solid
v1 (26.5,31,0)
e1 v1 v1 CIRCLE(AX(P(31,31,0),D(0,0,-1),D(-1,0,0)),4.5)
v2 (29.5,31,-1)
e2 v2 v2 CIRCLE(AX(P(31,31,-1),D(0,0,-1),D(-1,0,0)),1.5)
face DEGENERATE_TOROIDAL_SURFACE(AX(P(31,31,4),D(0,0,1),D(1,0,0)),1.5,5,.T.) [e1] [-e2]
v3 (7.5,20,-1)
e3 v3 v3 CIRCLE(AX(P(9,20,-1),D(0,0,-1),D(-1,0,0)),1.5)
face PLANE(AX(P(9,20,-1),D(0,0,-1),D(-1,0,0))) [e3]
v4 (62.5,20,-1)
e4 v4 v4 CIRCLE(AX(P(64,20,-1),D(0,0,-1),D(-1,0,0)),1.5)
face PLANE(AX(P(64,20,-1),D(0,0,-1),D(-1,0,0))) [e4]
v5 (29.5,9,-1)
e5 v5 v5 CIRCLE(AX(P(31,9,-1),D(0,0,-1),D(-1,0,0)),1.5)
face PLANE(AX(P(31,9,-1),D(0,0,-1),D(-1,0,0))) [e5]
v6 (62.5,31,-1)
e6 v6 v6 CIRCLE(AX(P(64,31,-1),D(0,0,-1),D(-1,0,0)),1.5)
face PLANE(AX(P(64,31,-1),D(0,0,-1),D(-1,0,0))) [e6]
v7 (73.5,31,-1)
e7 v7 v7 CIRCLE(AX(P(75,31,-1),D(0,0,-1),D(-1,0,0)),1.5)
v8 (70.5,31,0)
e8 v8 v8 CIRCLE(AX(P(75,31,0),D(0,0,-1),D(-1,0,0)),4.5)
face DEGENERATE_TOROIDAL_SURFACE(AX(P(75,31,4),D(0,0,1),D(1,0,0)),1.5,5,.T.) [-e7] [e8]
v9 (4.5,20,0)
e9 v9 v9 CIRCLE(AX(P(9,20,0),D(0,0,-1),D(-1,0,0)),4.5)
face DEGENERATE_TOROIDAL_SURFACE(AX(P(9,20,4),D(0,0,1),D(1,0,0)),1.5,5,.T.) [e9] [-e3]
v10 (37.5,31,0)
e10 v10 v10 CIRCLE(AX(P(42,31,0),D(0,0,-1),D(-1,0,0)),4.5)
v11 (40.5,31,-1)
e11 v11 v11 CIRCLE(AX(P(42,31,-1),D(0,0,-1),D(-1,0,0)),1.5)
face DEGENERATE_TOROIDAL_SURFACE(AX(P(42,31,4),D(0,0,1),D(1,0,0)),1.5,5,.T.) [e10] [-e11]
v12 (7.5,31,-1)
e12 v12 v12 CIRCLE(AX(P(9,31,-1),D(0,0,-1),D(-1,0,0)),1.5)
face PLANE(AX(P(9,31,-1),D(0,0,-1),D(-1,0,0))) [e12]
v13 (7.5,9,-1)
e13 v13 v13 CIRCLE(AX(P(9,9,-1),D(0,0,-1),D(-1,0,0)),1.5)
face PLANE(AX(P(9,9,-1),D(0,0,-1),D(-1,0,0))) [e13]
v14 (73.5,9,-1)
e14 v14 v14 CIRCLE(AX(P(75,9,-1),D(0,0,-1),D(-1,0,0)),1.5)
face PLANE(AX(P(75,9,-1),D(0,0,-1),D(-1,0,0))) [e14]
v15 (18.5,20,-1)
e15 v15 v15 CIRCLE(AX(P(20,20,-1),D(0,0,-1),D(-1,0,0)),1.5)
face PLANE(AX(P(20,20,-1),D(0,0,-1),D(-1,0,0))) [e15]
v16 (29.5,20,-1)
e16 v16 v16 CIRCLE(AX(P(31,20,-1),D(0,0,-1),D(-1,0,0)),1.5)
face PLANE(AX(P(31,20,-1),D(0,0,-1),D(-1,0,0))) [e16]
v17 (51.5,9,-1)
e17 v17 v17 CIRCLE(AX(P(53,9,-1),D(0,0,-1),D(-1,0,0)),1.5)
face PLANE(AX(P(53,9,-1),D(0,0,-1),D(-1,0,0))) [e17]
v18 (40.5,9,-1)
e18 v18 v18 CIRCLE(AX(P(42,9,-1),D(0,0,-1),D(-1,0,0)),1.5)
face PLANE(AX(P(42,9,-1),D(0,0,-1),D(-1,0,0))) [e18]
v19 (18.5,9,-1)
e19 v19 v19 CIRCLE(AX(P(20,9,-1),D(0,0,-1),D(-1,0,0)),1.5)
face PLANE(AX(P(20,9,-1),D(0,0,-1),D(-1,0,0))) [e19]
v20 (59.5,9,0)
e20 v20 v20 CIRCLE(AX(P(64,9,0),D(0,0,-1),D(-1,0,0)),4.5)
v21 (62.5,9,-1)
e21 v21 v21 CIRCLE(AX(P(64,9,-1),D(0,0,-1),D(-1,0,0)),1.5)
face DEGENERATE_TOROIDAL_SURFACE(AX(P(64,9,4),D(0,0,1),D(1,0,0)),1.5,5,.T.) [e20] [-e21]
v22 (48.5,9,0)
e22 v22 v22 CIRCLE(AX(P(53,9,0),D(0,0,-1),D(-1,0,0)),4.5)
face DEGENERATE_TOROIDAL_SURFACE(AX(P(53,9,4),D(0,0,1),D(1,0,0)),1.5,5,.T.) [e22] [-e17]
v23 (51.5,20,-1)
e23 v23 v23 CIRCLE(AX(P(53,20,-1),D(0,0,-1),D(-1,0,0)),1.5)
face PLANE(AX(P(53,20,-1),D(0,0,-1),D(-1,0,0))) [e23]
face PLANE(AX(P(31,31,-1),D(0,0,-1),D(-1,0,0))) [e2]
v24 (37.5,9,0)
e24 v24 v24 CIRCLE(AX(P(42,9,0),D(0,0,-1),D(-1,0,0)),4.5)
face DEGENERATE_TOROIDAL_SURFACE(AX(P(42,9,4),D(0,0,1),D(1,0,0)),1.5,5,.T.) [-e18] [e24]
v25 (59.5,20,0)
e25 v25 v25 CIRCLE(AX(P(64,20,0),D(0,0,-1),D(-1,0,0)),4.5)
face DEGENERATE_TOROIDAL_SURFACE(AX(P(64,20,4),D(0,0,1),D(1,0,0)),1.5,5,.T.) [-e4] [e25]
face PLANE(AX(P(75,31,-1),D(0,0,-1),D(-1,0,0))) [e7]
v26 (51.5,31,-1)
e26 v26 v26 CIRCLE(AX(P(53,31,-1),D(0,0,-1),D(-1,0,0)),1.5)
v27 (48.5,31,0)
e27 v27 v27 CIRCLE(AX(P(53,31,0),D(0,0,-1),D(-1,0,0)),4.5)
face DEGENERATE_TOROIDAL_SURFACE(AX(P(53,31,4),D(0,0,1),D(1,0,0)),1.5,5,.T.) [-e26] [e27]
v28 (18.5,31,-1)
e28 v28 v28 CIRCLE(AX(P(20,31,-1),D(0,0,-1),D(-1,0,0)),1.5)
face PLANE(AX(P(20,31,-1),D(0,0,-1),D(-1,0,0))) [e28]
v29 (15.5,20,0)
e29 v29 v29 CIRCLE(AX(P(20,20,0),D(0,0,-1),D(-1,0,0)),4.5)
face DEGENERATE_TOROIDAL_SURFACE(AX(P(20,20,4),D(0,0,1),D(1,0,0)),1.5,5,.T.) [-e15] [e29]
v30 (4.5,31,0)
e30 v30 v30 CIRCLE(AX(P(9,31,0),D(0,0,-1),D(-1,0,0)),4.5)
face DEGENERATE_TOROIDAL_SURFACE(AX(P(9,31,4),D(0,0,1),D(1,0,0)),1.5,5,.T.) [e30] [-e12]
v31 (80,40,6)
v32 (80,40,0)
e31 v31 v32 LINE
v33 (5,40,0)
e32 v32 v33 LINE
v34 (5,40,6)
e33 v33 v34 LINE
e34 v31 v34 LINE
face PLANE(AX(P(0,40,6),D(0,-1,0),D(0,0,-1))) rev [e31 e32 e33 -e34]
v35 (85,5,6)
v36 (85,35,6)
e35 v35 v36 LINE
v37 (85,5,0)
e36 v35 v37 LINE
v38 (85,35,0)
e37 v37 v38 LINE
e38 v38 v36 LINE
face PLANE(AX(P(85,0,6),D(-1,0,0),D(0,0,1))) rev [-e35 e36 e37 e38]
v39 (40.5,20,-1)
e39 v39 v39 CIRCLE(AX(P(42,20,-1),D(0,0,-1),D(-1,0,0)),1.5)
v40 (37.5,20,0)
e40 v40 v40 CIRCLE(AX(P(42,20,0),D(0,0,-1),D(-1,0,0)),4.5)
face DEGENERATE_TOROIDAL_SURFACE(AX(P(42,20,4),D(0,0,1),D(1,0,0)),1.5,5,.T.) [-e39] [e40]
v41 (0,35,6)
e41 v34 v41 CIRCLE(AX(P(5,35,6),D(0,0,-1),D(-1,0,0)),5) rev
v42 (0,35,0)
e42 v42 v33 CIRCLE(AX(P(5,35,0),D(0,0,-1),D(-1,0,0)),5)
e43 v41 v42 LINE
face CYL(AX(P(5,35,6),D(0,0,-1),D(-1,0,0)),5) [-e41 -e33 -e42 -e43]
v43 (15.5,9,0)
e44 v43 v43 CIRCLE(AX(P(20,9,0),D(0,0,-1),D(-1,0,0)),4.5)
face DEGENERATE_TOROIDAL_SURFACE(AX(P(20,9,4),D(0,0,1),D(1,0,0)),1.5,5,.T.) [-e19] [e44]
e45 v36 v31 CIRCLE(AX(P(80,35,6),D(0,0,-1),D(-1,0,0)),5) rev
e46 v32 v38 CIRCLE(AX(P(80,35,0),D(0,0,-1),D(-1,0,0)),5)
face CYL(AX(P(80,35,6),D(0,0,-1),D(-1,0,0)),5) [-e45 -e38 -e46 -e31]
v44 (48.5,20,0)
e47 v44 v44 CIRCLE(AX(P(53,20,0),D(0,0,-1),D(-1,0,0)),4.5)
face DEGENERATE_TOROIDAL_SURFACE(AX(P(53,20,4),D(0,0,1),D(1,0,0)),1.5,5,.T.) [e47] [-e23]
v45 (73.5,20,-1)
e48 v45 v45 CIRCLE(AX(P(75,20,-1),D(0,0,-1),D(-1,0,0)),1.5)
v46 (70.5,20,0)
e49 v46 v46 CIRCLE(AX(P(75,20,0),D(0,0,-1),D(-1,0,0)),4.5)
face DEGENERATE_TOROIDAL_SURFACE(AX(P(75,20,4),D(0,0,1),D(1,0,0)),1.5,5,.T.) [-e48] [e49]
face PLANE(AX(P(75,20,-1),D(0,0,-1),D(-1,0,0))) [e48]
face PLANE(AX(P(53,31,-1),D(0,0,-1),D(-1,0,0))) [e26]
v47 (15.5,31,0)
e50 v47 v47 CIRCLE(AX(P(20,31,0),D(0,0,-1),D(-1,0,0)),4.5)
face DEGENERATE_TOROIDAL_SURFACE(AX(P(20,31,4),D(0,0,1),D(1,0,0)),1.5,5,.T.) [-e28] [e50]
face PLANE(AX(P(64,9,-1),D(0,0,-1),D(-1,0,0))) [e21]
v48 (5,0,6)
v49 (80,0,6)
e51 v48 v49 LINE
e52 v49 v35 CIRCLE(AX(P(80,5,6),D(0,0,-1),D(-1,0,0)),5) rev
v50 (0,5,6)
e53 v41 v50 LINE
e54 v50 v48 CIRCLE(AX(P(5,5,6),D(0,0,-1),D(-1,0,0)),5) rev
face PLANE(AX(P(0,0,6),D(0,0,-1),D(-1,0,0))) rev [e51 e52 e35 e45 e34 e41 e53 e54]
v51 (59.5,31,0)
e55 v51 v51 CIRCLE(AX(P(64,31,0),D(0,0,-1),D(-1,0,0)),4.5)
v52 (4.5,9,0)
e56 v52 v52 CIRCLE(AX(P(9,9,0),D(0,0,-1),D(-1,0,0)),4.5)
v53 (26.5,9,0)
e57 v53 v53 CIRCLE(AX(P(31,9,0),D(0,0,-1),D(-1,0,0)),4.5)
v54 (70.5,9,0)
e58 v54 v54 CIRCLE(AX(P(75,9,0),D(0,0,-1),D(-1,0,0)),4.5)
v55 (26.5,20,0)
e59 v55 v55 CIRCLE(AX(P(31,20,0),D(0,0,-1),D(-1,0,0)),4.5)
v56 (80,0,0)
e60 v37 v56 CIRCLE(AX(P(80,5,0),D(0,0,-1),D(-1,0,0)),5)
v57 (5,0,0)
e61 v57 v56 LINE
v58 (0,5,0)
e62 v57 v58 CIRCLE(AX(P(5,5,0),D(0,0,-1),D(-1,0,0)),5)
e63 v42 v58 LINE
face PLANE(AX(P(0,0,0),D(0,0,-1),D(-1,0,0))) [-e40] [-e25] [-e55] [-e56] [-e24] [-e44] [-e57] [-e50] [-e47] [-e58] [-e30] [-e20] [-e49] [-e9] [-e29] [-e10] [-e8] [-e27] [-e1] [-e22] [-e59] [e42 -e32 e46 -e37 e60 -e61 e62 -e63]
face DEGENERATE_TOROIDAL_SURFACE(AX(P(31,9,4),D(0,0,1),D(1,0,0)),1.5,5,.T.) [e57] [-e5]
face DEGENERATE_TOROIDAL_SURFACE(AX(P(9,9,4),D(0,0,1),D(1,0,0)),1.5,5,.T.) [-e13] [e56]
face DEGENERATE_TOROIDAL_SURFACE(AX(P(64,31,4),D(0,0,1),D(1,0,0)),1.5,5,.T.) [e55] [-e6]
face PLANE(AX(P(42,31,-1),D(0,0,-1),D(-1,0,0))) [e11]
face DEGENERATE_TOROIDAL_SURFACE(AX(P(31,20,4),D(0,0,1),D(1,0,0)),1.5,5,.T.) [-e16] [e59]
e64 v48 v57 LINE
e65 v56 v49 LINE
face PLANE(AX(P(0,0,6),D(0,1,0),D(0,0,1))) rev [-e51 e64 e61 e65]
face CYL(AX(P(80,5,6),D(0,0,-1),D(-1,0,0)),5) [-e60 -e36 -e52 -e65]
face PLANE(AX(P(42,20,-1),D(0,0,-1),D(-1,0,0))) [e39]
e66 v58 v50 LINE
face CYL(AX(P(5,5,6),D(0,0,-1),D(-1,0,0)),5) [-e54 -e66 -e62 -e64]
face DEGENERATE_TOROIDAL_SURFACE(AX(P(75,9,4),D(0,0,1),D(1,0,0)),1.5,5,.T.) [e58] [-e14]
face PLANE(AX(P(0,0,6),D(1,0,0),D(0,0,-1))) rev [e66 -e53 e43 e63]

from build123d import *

# Parameters (mm, degrees)
ESQUISSE1_W                     = 85
ESQUISSE1_H                     = 40
BOSS_EXTRU_1_DEPTH              = 6
CONG_1_R                        = 5
ESQUISSE2_R                     = 4.5
BOSS_EXTRU_2_DEPTH              = 1
R_P_TITION_LIN_AIRE1_COUNT      = 7
R_P_TITION_LIN_AIRE1_PITCH      = 11
R_P_TITION_LIN_AIRE1_COUNT_DIR2 = 3
R_P_TITION_LIN_AIRE1_PITCH_DIR2 = 11
CONG_2_R                        = 5


with BuildPart() as part:
    # Esquisse1 → Boss.-Extru.1 (new body)
    with BuildSketch(Plane.XY):
        with Locations((42.5, 20)):
            Rectangle(ESQUISSE1_W, ESQUISSE1_H)
    extrude(amount=BOSS_EXTRU_1_DEPTH)

    # Congé1
    cong_1_edges = [part.edges().sort_by_distance(p)[0] for p in [
        (0, 40, 3),
        (85, 40, 3),
        (85, 0, 3),
        (0, 0, 3),
    ]]
    fillet(cong_1_edges, radius=CONG_1_R)

    # Esquisse2 → Boss.-Extru.2 (add)
    with BuildSketch(Plane(origin=(0, 0, 0), x_dir=(-1, 0, 0), z_dir=(0, 0, -1))):
        with Locations((-9, 31)):
            Circle(ESQUISSE2_R)
    boss_extru_2 = extrude(amount=BOSS_EXTRU_2_DEPTH)

    # Répétition linéaire1: Boss.-Extru.2 7 × 3
    with Locations(*[(i * R_P_TITION_LIN_AIRE1_PITCH, -j * R_P_TITION_LIN_AIRE1_PITCH_DIR2, 0) for i in range(R_P_TITION_LIN_AIRE1_COUNT) for j in range(R_P_TITION_LIN_AIRE1_COUNT_DIR2) if (i, j) != (0, 0)]):
        add(boss_extru_2)

    # Congé2
    # the kernel refuses this fillet: 5 mm, written as the material it takes off along each edge
    with BuildSketch(Plane(origin=(9, 31, -1), x_dir=(-1, 0, 0), z_dir=(0, -1, 0))) as cong_2_piece_1:
        with BuildLine():
            CenterArc((1.5, -5), CONG_2_R, 53.130102354, 36.869897646)
            Line((1.5, 0), (1.5, 0.1))
            Line((1.5, 0.1), (4.5, 0.1))
            Line((4.5, 0.1), (4.6, 0))
            ThreePointArc((4.6, 0), (4.6, -0.5), (4.56, -0.92))
            Line((4.56, -0.92), (4.5, -1))
        make_face()
    revolve(axis=Axis((9, 31, -1), (0, 0, -1)), mode=Mode.SUBTRACT)
    with BuildSketch(Plane(origin=(20, 20, -1), x_dir=(-1, 0, 0), z_dir=(0, -1, 0))) as cong_2_piece_2:
        with BuildLine():
            CenterArc((1.5, -5), CONG_2_R, 53.130102354, 36.869897646)
            Line((1.5, 0), (1.5, 0.1))
            Line((1.5, 0.1), (4.5, 0.1))
            Line((4.5, 0.1), (4.6, 0))
            ThreePointArc((4.6, 0), (4.6, -0.5), (4.56, -0.92))
            Line((4.56, -0.92), (4.5, -1))
        make_face()
    revolve(axis=Axis((20, 20, -1), (0, 0, -1)), mode=Mode.SUBTRACT)
    with BuildSketch(Plane(origin=(31, 20, -1), x_dir=(-1, 0, 0), z_dir=(0, -1, 0))) as cong_2_piece_3:
        with BuildLine():
            CenterArc((1.5, -5), CONG_2_R, 53.130102354, 36.869897646)
            Line((1.5, 0), (1.5, 0.1))
            Line((1.5, 0.1), (4.5, 0.1))
            Line((4.5, 0.1), (4.6, 0))
            ThreePointArc((4.6, 0), (4.6, -0.5), (4.56, -0.92))
            Line((4.56, -0.92), (4.5, -1))
        make_face()
    revolve(axis=Axis((31, 20, -1), (0, 0, -1)), mode=Mode.SUBTRACT)
    with BuildSketch(Plane(origin=(42, 20, -1), x_dir=(-1, 0, 0), z_dir=(0, -1, 0))) as cong_2_piece_4:
        with BuildLine():
            CenterArc((1.5, -5), CONG_2_R, 53.130102354, 36.869897646)
            Line((1.5, 0), (1.5, 0.1))
            Line((1.5, 0.1), (4.5, 0.1))
            Line((4.5, 0.1), (4.6, 0))
            ThreePointArc((4.6, 0), (4.6, -0.5), (4.56, -0.92))
            Line((4.56, -0.92), (4.5, -1))
        make_face()
    revolve(axis=Axis((42, 20, -1), (0, 0, -1)), mode=Mode.SUBTRACT)
    with BuildSketch(Plane(origin=(53, 20, -1), x_dir=(-1, 0, 0), z_dir=(0, -1, 0))) as cong_2_piece_5:
        with BuildLine():
            CenterArc((1.5, -5), CONG_2_R, 53.130102354, 36.869897646)
            Line((1.5, 0), (1.5, 0.1))
            Line((1.5, 0.1), (4.5, 0.1))
            Line((4.5, 0.1), (4.6, 0))
            ThreePointArc((4.6, 0), (4.6, -0.5), (4.56, -0.92))
            Line((4.56, -0.92), (4.5, -1))
        make_face()
    revolve(axis=Axis((53, 20, -1), (0, 0, -1)), mode=Mode.SUBTRACT)
    with BuildSketch(Plane(origin=(64, 20, -1), x_dir=(-1, 0, 0), z_dir=(0, -1, 0))) as cong_2_piece_6:
        with BuildLine():
            CenterArc((1.5, -5), CONG_2_R, 53.130102354, 36.869897646)
            Line((1.5, 0), (1.5, 0.1))
            Line((1.5, 0.1), (4.5, 0.1))
            Line((4.5, 0.1), (4.6, 0))
            ThreePointArc((4.6, 0), (4.6, -0.5), (4.56, -0.92))
            Line((4.56, -0.92), (4.5, -1))
        make_face()
    revolve(axis=Axis((64, 20, -1), (0, 0, -1)), mode=Mode.SUBTRACT)
    with BuildSketch(Plane(origin=(9, 20, -1), x_dir=(-1, 0, 0), z_dir=(0, -1, 0))) as cong_2_piece_7:
        with BuildLine():
            CenterArc((1.5, -5), CONG_2_R, 53.130102354, 36.869897646)
            Line((1.5, 0), (1.5, 0.1))
            Line((1.5, 0.1), (4.5, 0.1))
            Line((4.5, 0.1), (4.6, 0))
            ThreePointArc((4.6, 0), (4.6, -0.5), (4.56, -0.92))
            Line((4.56, -0.92), (4.5, -1))
        make_face()
    revolve(axis=Axis((9, 20, -1), (0, 0, -1)), mode=Mode.SUBTRACT)
    with BuildSketch(Plane(origin=(9, 9, -1), x_dir=(-1, 0, 0), z_dir=(0, -1, 0))) as cong_2_piece_8:
        with BuildLine():
            CenterArc((1.5, -5), CONG_2_R, 53.130102354, 36.869897646)
            Line((1.5, 0), (1.5, 0.1))
            Line((1.5, 0.1), (4.5, 0.1))
            Line((4.5, 0.1), (4.6, 0))
            ThreePointArc((4.6, 0), (4.6, -0.5), (4.56, -0.92))
            Line((4.56, -0.92), (4.5, -1))
        make_face()
    revolve(axis=Axis((9, 9, -1), (0, 0, -1)), mode=Mode.SUBTRACT)
    with BuildSketch(Plane(origin=(20, 31, -1), x_dir=(-1, 0, 0), z_dir=(0, -1, 0))) as cong_2_piece_9:
        with BuildLine():
            CenterArc((1.5, -5), CONG_2_R, 53.130102354, 36.869897646)
            Line((1.5, 0), (1.5, 0.1))
            Line((1.5, 0.1), (4.5, 0.1))
            Line((4.5, 0.1), (4.6, 0))
            ThreePointArc((4.6, 0), (4.6, -0.5), (4.56, -0.92))
            Line((4.56, -0.92), (4.5, -1))
        make_face()
    revolve(axis=Axis((20, 31, -1), (0, 0, -1)), mode=Mode.SUBTRACT)
    with BuildSketch(Plane(origin=(20, 9, -1), x_dir=(-1, 0, 0), z_dir=(0, -1, 0))) as cong_2_piece_10:
        with BuildLine():
            CenterArc((1.5, -5), CONG_2_R, 53.130102354, 36.869897646)
            Line((1.5, 0), (1.5, 0.1))
            Line((1.5, 0.1), (4.5, 0.1))
            Line((4.5, 0.1), (4.6, 0))
            ThreePointArc((4.6, 0), (4.6, -0.5), (4.56, -0.92))
            Line((4.56, -0.92), (4.5, -1))
        make_face()
    revolve(axis=Axis((20, 9, -1), (0, 0, -1)), mode=Mode.SUBTRACT)
    with BuildSketch(Plane(origin=(31, 31, -1), x_dir=(-1, 0, 0), z_dir=(0, -1, 0))) as cong_2_piece_11:
        with BuildLine():
            CenterArc((1.5, -5), CONG_2_R, 53.130102354, 36.869897646)
            Line((1.5, 0), (1.5, 0.1))
            Line((1.5, 0.1), (4.5, 0.1))
            Line((4.5, 0.1), (4.6, 0))
            ThreePointArc((4.6, 0), (4.6, -0.5), (4.56, -0.92))
            Line((4.56, -0.92), (4.5, -1))
        make_face()
    revolve(axis=Axis((31, 31, -1), (0, 0, -1)), mode=Mode.SUBTRACT)
    with BuildSketch(Plane(origin=(31, 9, -1), x_dir=(-1, 0, 0), z_dir=(0, -1, 0))) as cong_2_piece_12:
        with BuildLine():
            CenterArc((1.5, -5), CONG_2_R, 53.130102354, 36.869897646)
            Line((1.5, 0), (1.5, 0.1))
            Line((1.5, 0.1), (4.5, 0.1))
            Line((4.5, 0.1), (4.6, 0))
            ThreePointArc((4.6, 0), (4.6, -0.5), (4.56, -0.92))
            Line((4.56, -0.92), (4.5, -1))
        make_face()
    revolve(axis=Axis((31, 9, -1), (0, 0, -1)), mode=Mode.SUBTRACT)
    with BuildSketch(Plane(origin=(42, 31, -1), x_dir=(-1, 0, 0), z_dir=(0, -1, 0))) as cong_2_piece_13:
        with BuildLine():
            CenterArc((1.5, -5), CONG_2_R, 53.130102354, 36.869897646)
            Line((1.5, 0), (1.5, 0.1))
            Line((1.5, 0.1), (4.5, 0.1))
            Line((4.5, 0.1), (4.6, 0))
            ThreePointArc((4.6, 0), (4.6, -0.5), (4.56, -0.92))
            Line((4.56, -0.92), (4.5, -1))
        make_face()
    revolve(axis=Axis((42, 31, -1), (0, 0, -1)), mode=Mode.SUBTRACT)
    with BuildSketch(Plane(origin=(42, 9, -1), x_dir=(-1, 0, 0), z_dir=(0, -1, 0))) as cong_2_piece_14:
        with BuildLine():
            CenterArc((1.5, -5), CONG_2_R, 53.130102354, 36.869897646)
            Line((1.5, 0), (1.5, 0.1))
            Line((1.5, 0.1), (4.5, 0.1))
            Line((4.5, 0.1), (4.6, 0))
            ThreePointArc((4.6, 0), (4.6, -0.5), (4.56, -0.92))
            Line((4.56, -0.92), (4.5, -1))
        make_face()
    revolve(axis=Axis((42, 9, -1), (0, 0, -1)), mode=Mode.SUBTRACT)
    with BuildSketch(Plane(origin=(53, 31, -1), x_dir=(-1, 0, 0), z_dir=(0, -1, 0))) as cong_2_piece_15:
        with BuildLine():
            CenterArc((1.5, -5), CONG_2_R, 53.130102354, 36.869897646)
            Line((1.5, 0), (1.5, 0.1))
            Line((1.5, 0.1), (4.5, 0.1))
            Line((4.5, 0.1), (4.6, 0))
            ThreePointArc((4.6, 0), (4.6, -0.5), (4.56, -0.92))
            Line((4.56, -0.92), (4.5, -1))
        make_face()
    revolve(axis=Axis((53, 31, -1), (0, 0, -1)), mode=Mode.SUBTRACT)
    with BuildSketch(Plane(origin=(53, 9, -1), x_dir=(-1, 0, 0), z_dir=(0, -1, 0))) as cong_2_piece_16:
        with BuildLine():
            CenterArc((1.5, -5), CONG_2_R, 53.130102354, 36.869897646)
            Line((1.5, 0), (1.5, 0.1))
            Line((1.5, 0.1), (4.5, 0.1))
            Line((4.5, 0.1), (4.6, 0))
            ThreePointArc((4.6, 0), (4.6, -0.5), (4.56, -0.92))
            Line((4.56, -0.92), (4.5, -1))
        make_face()
    revolve(axis=Axis((53, 9, -1), (0, 0, -1)), mode=Mode.SUBTRACT)
    with BuildSketch(Plane(origin=(64, 31, -1), x_dir=(-1, 0, 0), z_dir=(0, -1, 0))) as cong_2_piece_17:
        with BuildLine():
            CenterArc((1.5, -5), CONG_2_R, 53.130102354, 36.869897646)
            Line((1.5, 0), (1.5, 0.1))
            Line((1.5, 0.1), (4.5, 0.1))
            Line((4.5, 0.1), (4.6, 0))
            ThreePointArc((4.6, 0), (4.6, -0.5), (4.56, -0.92))
            Line((4.56, -0.92), (4.5, -1))
        make_face()
    revolve(axis=Axis((64, 31, -1), (0, 0, -1)), mode=Mode.SUBTRACT)
    with BuildSketch(Plane(origin=(64, 9, -1), x_dir=(-1, 0, 0), z_dir=(0, -1, 0))) as cong_2_piece_18:
        with BuildLine():
            CenterArc((1.5, -5), CONG_2_R, 53.130102354, 36.869897646)
            Line((1.5, 0), (1.5, 0.1))
            Line((1.5, 0.1), (4.5, 0.1))
            Line((4.5, 0.1), (4.6, 0))
            ThreePointArc((4.6, 0), (4.6, -0.5), (4.56, -0.92))
            Line((4.56, -0.92), (4.5, -1))
        make_face()
    revolve(axis=Axis((64, 9, -1), (0, 0, -1)), mode=Mode.SUBTRACT)
    with BuildSketch(Plane(origin=(75, 31, -1), x_dir=(-1, 0, 0), z_dir=(0, -1, 0))) as cong_2_piece_19:
        with BuildLine():
            CenterArc((1.5, -5), CONG_2_R, 53.130102354, 36.869897646)
            Line((1.5, 0), (1.5, 0.1))
            Line((1.5, 0.1), (4.5, 0.1))
            Line((4.5, 0.1), (4.6, 0))
            ThreePointArc((4.6, 0), (4.6, -0.5), (4.56, -0.92))
            Line((4.56, -0.92), (4.5, -1))
        make_face()
    revolve(axis=Axis((75, 31, -1), (0, 0, -1)), mode=Mode.SUBTRACT)
    with BuildSketch(Plane(origin=(75, 20, -1), x_dir=(-1, 0, 0), z_dir=(0, -1, 0))) as cong_2_piece_20:
        with BuildLine():
            CenterArc((1.5, -5), CONG_2_R, 53.130102354, 36.869897646)
            Line((1.5, 0), (1.5, 0.1))
            Line((1.5, 0.1), (4.5, 0.1))
            Line((4.5, 0.1), (4.6, 0))
            ThreePointArc((4.6, 0), (4.6, -0.5), (4.56, -0.92))
            Line((4.56, -0.92), (4.5, -1))
        make_face()
    revolve(axis=Axis((75, 20, -1), (0, 0, -1)), mode=Mode.SUBTRACT)
    with BuildSketch(Plane(origin=(75, 9, -1), x_dir=(-1, 0, 0), z_dir=(0, -1, 0))) as cong_2_piece_21:
        with BuildLine():
            CenterArc((1.5, -5), CONG_2_R, 53.130102354, 36.869897646)
            Line((1.5, 0), (1.5, 0.1))
            Line((1.5, 0.1), (4.5, 0.1))
            Line((4.5, 0.1), (4.6, 0))
            ThreePointArc((4.6, 0), (4.6, -0.5), (4.56, -0.92))
            Line((4.56, -0.92), (4.5, -1))
        make_face()
    revolve(axis=Axis((75, 9, -1), (0, 0, -1)), mode=Mode.SUBTRACT)


solid = part.part
